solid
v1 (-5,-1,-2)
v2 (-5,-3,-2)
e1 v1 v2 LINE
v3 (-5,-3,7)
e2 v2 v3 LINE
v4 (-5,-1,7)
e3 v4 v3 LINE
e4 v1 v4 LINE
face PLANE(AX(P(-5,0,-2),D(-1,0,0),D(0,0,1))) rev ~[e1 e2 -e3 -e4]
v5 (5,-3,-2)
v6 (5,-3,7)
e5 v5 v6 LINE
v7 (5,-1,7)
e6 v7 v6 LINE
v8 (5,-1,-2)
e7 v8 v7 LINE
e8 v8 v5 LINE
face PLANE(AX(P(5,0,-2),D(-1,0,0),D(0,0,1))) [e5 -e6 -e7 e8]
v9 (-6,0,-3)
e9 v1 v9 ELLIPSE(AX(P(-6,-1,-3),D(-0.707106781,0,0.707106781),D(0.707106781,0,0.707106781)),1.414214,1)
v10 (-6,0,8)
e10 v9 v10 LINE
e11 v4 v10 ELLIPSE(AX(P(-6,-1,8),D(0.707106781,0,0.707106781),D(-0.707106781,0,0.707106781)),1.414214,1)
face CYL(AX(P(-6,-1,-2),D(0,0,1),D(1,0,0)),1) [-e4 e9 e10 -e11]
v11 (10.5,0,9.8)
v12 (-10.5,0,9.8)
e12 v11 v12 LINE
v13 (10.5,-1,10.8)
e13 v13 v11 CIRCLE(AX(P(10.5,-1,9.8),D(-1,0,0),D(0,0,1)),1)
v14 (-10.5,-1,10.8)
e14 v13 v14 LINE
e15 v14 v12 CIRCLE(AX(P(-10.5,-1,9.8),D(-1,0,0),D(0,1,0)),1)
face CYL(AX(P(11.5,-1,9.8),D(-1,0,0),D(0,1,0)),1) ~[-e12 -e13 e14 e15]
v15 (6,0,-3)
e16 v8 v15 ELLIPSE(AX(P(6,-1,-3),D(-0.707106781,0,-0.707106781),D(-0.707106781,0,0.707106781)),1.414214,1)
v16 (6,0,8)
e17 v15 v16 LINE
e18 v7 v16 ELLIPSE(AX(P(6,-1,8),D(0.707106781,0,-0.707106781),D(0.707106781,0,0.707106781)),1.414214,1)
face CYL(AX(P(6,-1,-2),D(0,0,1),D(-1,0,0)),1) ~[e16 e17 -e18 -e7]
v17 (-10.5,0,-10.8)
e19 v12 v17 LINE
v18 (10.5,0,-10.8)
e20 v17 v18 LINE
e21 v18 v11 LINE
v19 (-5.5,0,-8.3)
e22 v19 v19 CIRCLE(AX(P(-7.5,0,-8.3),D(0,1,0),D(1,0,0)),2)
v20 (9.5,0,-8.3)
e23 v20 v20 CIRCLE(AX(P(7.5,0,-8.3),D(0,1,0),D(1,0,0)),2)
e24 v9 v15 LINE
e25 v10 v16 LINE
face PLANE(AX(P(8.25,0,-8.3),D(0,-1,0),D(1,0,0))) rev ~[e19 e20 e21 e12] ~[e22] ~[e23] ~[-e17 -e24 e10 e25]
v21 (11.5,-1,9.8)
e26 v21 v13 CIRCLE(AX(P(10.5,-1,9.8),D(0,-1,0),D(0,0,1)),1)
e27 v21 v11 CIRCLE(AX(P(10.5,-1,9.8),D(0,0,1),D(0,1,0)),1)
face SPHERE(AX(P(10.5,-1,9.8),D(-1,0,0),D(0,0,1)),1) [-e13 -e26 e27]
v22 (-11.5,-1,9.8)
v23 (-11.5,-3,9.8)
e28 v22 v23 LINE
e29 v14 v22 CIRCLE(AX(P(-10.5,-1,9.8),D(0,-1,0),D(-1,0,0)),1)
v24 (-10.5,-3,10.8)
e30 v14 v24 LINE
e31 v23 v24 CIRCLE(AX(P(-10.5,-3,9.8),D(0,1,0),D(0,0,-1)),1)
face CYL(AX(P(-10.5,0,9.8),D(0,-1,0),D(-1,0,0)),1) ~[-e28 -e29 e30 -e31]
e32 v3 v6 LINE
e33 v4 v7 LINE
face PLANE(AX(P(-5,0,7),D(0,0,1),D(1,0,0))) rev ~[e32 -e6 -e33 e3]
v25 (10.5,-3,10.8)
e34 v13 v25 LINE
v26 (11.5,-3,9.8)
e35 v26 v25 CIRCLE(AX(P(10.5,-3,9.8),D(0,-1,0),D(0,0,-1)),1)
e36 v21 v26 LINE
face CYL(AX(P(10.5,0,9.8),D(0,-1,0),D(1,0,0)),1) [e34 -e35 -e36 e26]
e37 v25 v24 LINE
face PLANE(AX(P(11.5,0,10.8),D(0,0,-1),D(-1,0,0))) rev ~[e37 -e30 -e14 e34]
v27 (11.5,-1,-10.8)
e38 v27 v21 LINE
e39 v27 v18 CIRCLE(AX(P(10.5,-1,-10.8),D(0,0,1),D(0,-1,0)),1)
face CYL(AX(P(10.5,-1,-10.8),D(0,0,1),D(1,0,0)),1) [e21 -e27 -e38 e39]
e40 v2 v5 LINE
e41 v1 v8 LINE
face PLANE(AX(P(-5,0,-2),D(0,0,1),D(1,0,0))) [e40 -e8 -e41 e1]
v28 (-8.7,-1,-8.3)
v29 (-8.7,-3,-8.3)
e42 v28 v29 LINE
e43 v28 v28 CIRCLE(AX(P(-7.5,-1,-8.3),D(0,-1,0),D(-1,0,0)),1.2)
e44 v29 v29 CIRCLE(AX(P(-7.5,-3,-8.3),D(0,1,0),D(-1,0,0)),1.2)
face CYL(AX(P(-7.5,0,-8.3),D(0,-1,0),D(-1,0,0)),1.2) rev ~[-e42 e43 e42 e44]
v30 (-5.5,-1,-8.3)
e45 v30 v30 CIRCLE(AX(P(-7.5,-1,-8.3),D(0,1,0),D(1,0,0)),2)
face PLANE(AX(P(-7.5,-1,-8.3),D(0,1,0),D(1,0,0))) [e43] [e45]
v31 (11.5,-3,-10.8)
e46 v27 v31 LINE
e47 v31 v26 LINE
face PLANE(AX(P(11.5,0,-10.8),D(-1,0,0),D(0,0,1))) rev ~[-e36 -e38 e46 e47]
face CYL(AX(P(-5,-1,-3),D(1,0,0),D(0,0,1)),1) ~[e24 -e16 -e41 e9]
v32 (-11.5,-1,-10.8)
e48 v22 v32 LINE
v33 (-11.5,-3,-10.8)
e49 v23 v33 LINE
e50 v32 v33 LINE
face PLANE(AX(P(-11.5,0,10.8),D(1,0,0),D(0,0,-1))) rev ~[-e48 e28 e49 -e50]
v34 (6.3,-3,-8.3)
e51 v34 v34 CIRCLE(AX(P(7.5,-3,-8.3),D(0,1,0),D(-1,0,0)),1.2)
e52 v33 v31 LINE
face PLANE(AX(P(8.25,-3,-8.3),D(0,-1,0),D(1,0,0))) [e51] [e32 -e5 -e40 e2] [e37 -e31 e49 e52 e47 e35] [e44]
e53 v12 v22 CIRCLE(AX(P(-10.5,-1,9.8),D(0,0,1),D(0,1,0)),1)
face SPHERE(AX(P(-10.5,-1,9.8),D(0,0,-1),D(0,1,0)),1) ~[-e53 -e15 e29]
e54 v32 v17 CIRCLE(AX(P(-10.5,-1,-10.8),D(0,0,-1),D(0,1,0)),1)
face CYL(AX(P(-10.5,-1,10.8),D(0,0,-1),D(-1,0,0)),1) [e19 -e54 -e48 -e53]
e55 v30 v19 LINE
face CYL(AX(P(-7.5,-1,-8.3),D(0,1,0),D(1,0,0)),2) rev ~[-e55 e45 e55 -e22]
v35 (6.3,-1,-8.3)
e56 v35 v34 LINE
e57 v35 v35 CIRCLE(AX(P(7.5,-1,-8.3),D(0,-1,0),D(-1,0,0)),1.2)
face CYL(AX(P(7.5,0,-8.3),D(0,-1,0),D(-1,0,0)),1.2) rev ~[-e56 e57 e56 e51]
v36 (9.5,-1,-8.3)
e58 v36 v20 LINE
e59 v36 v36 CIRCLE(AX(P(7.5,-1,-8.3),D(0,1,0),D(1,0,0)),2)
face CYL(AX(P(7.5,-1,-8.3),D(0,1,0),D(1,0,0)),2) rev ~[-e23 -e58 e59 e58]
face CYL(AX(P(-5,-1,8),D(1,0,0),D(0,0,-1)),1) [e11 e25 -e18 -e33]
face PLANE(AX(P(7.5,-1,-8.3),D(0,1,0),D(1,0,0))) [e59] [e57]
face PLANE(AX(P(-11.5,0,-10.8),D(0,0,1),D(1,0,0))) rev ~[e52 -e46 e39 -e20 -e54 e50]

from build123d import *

# Parameters (mm, degrees)
F0_W           = 6.5
F0_H           = 5
F0_W_2         = 10
F0_H_2         = 9
F1_DEPTH       = 3
F2_D           = 2.4
F2_DEPTH       = 3
F2_CBORE_D     = 4
F2_CBORE_DEPTH = 1
F2_TIP         = 0.7210327428
F3_R           = 1


# Not quite as in the source:
# - a feature names something its author has since deleted; it is built from what else it names


with BuildPart() as f1:
    # F0 (on Front) → F1 (new body)
    with BuildSketch(Plane.XZ):
        with Locations((8.25, -8.3)):
            Rectangle(F0_W, F0_H)
        with Locations((0, -8.3)):
            Rectangle(F0_W_2, F0_H)
        with Locations((-8.25, -8.3)):
            Rectangle(F0_W, F0_H)
        Polygon((5, -5.8), (11.5, -5.8), (11.5, 10.8), (-11.5, 10.8), (-11.5, -5.8), (-5, -5.8), align=None)
        with Locations((0, 2.5)):
            Rectangle(F0_W_2, F0_H_2, mode=Mode.SUBTRACT)
    extrude(amount=F1_DEPTH)

    # F2
    with Locations(Plane(origin=(0, 0, 0), x_dir=(1, 0, 0), z_dir=(0, 1, 0))):
        with Locations((7.5, 8.3), (-7.5, 8.3)):
            CounterBoreHole(F2_D / 2, F2_CBORE_D / 2, F2_CBORE_DEPTH, depth=F2_DEPTH)
            with Locations((0, 0, -(F2_DEPTH + F2_TIP / 2))):  # 118° drill point
                Cone(0, F2_D / 2, F2_TIP, mode=Mode.SUBTRACT)

    # F3
    f3_edges = [f1.edges().sort_by_distance(p)[0] for p in [
        (-11.5, 0, 0),
        (0, 0, 10.8),
        (11.5, -1.5, 10.8),
        (-11.5, -1.5, 10.8),
        (11.5, 0, 0),
        (-5, 0, 2.5),
        (0, 0, 7),
        (5, 0, 2.5),
        (0, 0, -2),
    ]]
    fillet(f3_edges, radius=F3_R)


solid = f1.part
